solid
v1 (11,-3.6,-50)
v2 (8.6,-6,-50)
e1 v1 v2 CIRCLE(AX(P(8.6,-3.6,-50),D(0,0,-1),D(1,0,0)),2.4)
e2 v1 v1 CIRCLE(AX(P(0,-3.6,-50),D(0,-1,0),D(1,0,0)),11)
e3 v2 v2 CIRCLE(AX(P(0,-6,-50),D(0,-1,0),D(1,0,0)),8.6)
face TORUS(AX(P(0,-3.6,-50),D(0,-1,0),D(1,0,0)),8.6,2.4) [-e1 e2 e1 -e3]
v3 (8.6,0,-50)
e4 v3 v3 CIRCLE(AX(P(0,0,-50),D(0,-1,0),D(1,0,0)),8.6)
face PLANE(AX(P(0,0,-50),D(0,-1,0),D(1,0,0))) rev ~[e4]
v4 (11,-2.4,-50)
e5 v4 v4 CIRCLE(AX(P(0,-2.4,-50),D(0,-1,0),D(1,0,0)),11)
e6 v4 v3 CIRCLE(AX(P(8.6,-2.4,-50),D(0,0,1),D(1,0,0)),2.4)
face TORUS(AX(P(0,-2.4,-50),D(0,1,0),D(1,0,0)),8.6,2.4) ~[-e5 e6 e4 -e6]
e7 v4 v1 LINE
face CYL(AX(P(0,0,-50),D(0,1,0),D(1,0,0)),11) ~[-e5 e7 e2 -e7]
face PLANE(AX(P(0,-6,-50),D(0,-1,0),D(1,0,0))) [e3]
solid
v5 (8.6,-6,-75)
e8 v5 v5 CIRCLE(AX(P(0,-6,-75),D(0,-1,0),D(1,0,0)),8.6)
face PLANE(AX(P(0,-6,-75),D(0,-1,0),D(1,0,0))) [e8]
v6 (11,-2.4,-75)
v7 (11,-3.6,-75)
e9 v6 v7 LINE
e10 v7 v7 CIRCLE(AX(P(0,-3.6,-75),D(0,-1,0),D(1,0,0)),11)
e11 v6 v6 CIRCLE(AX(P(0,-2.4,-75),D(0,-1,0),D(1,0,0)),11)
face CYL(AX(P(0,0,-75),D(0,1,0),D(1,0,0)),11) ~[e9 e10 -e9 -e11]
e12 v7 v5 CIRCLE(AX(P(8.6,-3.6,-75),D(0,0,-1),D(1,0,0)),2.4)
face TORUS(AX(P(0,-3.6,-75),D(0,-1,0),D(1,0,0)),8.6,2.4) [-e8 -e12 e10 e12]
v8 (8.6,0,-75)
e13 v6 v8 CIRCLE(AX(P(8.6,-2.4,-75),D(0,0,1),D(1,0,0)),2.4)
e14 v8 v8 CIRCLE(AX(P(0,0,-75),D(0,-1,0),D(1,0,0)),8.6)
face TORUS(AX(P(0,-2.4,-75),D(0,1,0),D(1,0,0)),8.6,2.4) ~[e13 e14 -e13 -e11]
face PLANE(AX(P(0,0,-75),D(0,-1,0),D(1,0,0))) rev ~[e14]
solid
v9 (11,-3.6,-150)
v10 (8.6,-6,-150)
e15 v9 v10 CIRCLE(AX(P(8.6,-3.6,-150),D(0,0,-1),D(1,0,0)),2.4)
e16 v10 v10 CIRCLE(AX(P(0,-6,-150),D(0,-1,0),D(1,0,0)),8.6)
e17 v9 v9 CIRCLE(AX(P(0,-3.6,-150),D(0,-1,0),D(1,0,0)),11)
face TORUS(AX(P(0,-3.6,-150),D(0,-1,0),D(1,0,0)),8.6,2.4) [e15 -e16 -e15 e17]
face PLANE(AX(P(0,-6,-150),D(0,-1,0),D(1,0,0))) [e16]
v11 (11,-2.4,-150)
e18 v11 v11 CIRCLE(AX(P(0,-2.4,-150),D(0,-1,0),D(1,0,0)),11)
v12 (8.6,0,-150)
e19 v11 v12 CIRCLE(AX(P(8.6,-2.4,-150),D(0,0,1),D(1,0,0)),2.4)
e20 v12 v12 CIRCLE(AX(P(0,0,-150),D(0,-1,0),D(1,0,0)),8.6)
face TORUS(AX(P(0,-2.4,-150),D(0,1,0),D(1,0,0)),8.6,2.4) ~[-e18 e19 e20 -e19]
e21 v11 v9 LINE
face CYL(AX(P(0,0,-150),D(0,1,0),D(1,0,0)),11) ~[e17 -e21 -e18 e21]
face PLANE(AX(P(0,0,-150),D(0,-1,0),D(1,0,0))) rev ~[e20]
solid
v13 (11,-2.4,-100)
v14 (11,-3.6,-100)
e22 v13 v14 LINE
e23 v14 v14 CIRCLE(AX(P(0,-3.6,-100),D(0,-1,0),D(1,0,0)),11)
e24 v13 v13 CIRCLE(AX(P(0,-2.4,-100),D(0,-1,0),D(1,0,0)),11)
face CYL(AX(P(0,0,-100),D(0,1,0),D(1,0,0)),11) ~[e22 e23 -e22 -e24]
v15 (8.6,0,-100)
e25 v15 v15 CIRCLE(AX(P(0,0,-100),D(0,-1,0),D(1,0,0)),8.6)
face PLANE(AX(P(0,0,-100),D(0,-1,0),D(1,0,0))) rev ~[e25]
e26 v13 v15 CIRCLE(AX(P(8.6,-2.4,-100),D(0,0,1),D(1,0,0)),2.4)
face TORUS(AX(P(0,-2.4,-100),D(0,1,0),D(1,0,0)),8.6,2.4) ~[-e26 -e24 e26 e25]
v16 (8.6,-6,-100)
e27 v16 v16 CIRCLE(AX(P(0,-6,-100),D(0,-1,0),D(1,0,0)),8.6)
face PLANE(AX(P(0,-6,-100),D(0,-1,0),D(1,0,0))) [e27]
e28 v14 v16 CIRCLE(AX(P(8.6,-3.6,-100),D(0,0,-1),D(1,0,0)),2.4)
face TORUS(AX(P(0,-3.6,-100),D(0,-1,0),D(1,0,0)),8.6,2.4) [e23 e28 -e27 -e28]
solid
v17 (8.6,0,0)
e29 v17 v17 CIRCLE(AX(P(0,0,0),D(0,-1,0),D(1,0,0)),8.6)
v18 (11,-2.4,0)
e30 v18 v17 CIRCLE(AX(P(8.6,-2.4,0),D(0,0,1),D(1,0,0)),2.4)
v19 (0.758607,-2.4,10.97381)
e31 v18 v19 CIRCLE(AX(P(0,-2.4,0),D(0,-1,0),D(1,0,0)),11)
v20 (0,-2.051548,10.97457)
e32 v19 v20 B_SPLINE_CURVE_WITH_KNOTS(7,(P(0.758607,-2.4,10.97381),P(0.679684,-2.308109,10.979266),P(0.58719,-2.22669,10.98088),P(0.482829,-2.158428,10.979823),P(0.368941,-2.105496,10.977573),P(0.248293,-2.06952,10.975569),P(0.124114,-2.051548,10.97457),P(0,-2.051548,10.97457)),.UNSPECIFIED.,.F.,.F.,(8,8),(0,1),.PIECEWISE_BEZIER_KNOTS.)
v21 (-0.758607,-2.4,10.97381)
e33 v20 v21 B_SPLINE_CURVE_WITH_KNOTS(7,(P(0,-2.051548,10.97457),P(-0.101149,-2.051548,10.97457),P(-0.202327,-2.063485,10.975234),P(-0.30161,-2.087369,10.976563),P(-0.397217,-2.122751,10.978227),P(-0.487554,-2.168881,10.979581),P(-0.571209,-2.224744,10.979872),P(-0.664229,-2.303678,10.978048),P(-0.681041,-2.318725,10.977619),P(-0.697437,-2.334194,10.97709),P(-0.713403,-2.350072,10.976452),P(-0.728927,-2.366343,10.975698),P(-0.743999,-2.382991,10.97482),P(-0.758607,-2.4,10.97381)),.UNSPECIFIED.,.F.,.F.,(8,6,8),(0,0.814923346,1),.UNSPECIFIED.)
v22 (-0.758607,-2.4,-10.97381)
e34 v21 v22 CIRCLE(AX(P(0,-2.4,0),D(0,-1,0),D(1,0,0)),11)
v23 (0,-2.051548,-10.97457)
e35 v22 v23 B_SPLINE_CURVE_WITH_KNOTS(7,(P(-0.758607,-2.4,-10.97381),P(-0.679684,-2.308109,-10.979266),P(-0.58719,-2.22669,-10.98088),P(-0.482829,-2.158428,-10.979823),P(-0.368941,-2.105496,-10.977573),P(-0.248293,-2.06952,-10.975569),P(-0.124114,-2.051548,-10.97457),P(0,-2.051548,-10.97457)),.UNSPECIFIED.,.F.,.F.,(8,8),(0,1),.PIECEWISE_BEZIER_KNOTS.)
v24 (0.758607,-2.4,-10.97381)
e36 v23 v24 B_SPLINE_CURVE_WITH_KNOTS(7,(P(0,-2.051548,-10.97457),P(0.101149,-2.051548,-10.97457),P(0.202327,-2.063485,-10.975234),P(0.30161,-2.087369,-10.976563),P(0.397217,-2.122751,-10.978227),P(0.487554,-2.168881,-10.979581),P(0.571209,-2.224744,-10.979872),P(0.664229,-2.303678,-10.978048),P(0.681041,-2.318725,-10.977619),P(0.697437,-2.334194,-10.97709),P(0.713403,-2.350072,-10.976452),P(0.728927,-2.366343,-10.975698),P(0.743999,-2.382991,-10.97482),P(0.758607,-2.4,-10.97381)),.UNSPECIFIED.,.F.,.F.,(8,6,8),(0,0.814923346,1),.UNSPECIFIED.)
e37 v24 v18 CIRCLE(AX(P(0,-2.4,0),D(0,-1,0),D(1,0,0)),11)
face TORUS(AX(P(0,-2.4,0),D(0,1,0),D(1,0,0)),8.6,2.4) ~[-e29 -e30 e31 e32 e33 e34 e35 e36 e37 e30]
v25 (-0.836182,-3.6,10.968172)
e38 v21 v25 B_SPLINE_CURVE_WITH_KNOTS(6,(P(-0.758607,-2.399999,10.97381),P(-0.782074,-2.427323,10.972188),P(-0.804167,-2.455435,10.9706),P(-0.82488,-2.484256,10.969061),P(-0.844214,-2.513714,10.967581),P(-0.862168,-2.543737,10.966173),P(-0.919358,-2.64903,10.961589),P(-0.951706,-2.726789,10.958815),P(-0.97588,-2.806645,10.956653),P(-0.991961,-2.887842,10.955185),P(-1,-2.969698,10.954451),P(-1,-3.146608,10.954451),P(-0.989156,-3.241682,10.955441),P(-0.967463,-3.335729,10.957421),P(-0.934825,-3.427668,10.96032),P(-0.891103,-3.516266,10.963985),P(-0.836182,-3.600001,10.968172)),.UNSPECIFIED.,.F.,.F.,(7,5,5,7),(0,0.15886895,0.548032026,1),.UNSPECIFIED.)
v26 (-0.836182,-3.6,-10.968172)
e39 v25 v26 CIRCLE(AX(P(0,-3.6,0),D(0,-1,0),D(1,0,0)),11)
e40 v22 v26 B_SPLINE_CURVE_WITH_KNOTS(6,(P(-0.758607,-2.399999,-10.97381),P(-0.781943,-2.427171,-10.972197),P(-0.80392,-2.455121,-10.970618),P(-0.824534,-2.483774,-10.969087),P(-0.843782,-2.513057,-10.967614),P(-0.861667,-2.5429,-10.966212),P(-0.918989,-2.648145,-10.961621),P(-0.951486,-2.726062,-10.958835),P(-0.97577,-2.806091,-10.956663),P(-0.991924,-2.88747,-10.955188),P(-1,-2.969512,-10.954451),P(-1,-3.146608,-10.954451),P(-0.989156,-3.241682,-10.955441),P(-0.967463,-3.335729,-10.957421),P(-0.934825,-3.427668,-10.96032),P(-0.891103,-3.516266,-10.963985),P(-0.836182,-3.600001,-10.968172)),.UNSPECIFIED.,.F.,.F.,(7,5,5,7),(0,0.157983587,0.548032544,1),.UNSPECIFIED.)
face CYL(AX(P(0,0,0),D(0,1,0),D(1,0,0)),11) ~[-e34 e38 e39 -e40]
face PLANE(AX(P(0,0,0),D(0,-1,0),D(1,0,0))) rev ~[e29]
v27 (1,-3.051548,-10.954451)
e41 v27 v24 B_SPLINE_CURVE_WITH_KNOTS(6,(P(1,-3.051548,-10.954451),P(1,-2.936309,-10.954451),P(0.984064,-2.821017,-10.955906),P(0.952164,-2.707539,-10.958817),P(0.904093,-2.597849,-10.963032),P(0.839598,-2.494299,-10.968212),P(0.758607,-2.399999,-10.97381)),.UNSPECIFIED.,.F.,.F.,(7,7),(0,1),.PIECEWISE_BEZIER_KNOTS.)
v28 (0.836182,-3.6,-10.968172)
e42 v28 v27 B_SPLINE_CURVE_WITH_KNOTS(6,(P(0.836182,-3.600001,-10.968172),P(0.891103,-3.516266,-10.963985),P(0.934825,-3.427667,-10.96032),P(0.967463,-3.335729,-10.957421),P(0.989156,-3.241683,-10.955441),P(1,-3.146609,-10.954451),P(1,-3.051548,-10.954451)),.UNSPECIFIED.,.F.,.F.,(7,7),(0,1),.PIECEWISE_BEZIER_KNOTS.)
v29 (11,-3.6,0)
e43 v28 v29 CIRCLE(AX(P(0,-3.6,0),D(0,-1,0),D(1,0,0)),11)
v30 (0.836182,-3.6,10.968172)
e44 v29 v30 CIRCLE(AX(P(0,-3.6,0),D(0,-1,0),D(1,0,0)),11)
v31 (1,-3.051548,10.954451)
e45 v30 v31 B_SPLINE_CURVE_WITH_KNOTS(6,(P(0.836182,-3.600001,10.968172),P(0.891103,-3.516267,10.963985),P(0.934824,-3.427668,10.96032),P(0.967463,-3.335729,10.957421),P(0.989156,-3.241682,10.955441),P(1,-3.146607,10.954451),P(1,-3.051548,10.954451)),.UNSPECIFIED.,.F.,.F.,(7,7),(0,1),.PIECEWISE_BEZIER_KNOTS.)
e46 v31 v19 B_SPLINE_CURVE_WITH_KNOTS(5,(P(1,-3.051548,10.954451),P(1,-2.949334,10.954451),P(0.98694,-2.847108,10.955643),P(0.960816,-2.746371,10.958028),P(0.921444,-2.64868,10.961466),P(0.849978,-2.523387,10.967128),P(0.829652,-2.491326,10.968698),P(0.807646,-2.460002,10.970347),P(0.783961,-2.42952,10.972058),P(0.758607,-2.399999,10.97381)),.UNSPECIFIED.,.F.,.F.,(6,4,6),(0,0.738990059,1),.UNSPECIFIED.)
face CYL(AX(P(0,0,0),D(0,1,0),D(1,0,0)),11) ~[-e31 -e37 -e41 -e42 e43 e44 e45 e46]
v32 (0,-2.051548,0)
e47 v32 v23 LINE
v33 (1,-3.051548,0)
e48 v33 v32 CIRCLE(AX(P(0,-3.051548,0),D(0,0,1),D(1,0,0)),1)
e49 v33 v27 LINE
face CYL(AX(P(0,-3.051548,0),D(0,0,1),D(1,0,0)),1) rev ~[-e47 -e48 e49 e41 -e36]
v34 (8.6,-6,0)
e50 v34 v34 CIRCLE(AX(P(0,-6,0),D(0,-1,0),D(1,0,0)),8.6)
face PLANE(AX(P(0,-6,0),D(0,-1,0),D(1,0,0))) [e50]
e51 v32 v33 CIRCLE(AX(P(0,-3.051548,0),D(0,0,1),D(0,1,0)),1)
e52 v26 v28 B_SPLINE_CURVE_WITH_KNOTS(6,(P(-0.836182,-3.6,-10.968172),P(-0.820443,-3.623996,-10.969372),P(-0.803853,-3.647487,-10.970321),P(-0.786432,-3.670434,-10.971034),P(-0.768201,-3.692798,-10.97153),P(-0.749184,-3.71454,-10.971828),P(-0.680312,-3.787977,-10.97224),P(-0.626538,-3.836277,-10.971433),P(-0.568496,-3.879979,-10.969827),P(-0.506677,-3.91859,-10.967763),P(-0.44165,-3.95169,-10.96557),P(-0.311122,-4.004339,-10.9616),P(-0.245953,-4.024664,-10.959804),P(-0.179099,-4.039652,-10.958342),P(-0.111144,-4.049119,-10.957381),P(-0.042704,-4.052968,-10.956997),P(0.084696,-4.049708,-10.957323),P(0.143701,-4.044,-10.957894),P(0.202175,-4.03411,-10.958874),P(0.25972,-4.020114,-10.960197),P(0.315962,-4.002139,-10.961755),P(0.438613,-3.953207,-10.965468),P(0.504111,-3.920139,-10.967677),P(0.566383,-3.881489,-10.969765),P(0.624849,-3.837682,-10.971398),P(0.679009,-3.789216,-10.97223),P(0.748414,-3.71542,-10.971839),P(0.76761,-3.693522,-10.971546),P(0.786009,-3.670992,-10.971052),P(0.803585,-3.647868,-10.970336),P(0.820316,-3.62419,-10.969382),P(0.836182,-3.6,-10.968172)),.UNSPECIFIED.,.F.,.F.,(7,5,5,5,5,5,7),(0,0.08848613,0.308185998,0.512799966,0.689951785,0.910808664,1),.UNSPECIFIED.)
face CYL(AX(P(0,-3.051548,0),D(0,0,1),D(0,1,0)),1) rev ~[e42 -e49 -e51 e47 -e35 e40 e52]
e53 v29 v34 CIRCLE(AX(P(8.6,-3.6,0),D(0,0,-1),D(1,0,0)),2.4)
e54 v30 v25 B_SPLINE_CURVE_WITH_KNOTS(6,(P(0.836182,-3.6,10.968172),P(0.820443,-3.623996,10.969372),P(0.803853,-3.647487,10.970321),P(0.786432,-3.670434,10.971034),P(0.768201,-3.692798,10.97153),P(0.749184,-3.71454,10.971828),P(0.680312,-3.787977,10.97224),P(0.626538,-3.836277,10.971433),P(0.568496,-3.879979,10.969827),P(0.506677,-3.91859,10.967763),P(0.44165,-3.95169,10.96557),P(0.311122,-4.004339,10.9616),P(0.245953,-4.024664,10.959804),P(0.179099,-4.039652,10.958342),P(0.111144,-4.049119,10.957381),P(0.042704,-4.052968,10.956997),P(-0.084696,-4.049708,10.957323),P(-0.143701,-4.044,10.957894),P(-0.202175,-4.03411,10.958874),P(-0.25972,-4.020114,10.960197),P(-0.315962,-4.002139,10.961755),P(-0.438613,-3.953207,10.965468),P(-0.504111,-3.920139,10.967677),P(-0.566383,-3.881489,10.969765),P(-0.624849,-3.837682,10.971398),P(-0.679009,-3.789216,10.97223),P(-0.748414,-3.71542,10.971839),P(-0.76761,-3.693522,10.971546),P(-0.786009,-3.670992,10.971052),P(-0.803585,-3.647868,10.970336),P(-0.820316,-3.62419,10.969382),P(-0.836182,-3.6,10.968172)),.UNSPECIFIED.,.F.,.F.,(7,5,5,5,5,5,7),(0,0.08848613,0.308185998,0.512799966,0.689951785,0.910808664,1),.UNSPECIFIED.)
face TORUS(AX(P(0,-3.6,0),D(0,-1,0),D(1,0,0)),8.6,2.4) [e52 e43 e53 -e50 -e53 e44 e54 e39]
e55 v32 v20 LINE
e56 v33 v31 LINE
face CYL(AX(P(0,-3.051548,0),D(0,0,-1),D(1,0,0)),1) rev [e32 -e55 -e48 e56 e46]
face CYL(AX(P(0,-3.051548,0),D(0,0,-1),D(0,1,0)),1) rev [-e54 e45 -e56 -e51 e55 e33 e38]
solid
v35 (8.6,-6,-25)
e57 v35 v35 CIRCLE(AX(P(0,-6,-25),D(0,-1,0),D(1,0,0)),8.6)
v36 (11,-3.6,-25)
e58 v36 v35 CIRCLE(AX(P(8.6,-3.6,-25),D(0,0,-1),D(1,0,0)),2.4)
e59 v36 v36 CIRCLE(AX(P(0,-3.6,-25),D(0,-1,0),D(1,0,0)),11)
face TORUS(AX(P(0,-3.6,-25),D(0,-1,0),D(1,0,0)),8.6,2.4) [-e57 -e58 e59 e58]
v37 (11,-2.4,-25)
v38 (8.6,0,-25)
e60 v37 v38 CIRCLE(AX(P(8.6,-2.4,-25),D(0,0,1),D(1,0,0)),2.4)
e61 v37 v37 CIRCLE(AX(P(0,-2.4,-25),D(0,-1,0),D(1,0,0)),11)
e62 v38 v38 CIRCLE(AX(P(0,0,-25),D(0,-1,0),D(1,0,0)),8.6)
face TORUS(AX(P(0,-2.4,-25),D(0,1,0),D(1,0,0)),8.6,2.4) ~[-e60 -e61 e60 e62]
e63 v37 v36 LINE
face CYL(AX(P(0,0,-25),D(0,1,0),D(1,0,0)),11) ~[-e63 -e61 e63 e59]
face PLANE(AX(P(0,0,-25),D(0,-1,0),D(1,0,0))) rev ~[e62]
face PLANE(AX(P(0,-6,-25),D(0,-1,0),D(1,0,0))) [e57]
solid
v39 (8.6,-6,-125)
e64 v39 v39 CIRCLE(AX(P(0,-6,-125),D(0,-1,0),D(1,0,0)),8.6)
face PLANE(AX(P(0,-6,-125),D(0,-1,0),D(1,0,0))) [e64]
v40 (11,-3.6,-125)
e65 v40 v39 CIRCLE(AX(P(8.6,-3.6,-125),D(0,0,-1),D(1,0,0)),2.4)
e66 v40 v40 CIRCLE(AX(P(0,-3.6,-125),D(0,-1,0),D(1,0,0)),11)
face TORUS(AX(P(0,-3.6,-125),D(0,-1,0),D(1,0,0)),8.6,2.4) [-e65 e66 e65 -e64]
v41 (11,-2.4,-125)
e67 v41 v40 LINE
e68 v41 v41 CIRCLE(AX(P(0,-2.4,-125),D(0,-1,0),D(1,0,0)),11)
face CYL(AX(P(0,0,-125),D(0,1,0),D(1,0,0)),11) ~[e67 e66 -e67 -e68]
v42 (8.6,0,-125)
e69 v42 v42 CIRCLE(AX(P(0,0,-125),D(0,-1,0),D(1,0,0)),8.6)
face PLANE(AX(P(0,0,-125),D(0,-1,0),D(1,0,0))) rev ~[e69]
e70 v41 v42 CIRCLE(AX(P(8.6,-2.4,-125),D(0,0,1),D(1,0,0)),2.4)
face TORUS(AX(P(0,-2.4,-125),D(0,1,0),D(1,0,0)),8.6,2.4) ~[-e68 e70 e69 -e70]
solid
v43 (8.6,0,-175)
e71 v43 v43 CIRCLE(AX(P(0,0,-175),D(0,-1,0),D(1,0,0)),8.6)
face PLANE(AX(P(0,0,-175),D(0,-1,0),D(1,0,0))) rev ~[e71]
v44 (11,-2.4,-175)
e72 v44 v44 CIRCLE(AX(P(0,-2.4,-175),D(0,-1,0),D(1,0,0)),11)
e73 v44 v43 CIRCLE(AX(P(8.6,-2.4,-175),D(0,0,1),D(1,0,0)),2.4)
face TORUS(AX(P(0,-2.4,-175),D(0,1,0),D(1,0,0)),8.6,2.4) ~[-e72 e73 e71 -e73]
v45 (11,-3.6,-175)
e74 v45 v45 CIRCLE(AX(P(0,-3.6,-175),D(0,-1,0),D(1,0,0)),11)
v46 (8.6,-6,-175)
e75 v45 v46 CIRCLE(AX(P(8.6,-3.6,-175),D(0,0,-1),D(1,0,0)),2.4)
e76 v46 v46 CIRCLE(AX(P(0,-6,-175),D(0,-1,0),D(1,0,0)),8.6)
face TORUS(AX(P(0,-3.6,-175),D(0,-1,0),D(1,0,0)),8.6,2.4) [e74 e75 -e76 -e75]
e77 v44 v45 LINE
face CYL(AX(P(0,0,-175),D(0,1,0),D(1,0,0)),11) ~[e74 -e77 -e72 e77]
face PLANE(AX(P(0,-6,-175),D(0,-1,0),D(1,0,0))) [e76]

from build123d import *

# Parameters (mm, degrees)
F0_R          = 11
F1_DEPTH      = 6
F2_R          = 2.4
F2_2_R        = 2.4
F2_3_R        = 2.4
F2_4_R        = 2.4
F2_5_R        = 2.4
F2_6_R        = 2.4
F2_7_R        = 2.4
F2_8_R        = 2.4
F4_DEPTH      = 186.001
F4_DEPTH_BACK = 11.0010001


with BuildPart() as f1:
    # F0 (on Front) → F1 (new body)
    with BuildSketch(Plane.XZ):
        Circle(F0_R)
    extrude(amount=F1_DEPTH)

    # F2
    f2_edges = [f1.edges().sort_by_distance(p)[0] for p in [
        (-11, 0, 0),
        (-11, -6, 0),
    ]]
    fillet(f2_edges, radius=F2_R)

    # F3 (on Top) → F4 (cut, two sides)
    with BuildSketch(Plane.XY) as f4_sk:
        with BuildLine():
            ThreePointArc((0, -2.0515482649), (-0.7071067812, -3.7586550461), (1, -3.0515482649))
            ThreePointArc((1, -3.0515482649), (0.7071067812, -2.3444414837), (0, -2.0515482649))
        make_face()
    extrude(amount=-F4_DEPTH, mode=Mode.SUBTRACT)
    extrude(f4_sk.sketch, amount=F4_DEPTH_BACK, mode=Mode.SUBTRACT)


with BuildPart() as f1b:
    # F0 (on Front) → F1, piece 2 (new body)
    with BuildSketch(Plane.XZ):
        with Locations((0, -25)):
            Circle(F0_R)
    extrude(amount=F1_DEPTH)

    # F2#2
    f2_2_edges = [f1b.edges().sort_by_distance(p)[0] for p in [
        (-11, -6, -25),
        (-11, 0, -25),
    ]]
    fillet(f2_2_edges, radius=F2_2_R)


with BuildPart() as f1c:
    # F0 (on Front) → F1, piece 3 (new body)
    with BuildSketch(Plane.XZ):
        with Locations((0, -50)):
            Circle(F0_R)
    extrude(amount=F1_DEPTH)

    # F2#3
    f2_3_edges = [f1c.edges().sort_by_distance(p)[0] for p in [
        (-11, -6, -50),
        (-11, 0, -50),
    ]]
    fillet(f2_3_edges, radius=F2_3_R)


with BuildPart() as f1d:
    # F0 (on Front) → F1, piece 4 (new body)
    with BuildSketch(Plane.XZ):
        with Locations((0, -75)):
            Circle(F0_R)
    extrude(amount=F1_DEPTH)

    # F2#4
    f2_4_edges = [f1d.edges().sort_by_distance(p)[0] for p in [
        (-11, -6, -75),
        (-11, 0, -75),
    ]]
    fillet(f2_4_edges, radius=F2_4_R)


with BuildPart() as f1e:
    # F0 (on Front) → F1, piece 5 (new body)
    with BuildSketch(Plane.XZ):
        with Locations((0, -100)):
            Circle(F0_R)
    extrude(amount=F1_DEPTH)

    # F2#5
    f2_5_edges = [f1e.edges().sort_by_distance(p)[0] for p in [
        (-11, -6, -100),
        (-11, 0, -100),
    ]]
    fillet(f2_5_edges, radius=F2_5_R)


with BuildPart() as f1f:
    # F0 (on Front) → F1, piece 6 (new body)
    with BuildSketch(Plane.XZ):
        with Locations((0, -125)):
            Circle(F0_R)
    extrude(amount=F1_DEPTH)

    # F2#6
    f2_6_edges = [f1f.edges().sort_by_distance(p)[0] for p in [
        (-11, -6, -125),
        (-11, 0, -125),
    ]]
    fillet(f2_6_edges, radius=F2_6_R)


with BuildPart() as f1g:
    # F0 (on Front) → F1, piece 7 (new body)
    with BuildSketch(Plane.XZ):
        with Locations((0, -150)):
            Circle(F0_R)
    extrude(amount=F1_DEPTH)

    # F2#7
    f2_7_edges = [f1g.edges().sort_by_distance(p)[0] for p in [
        (-11, -6, -150),
        (-11, 0, -150),
    ]]
    fillet(f2_7_edges, radius=F2_7_R)


with BuildPart() as f1h:
    # F0 (on Front) → F1, piece 8 (new body)
    with BuildSketch(Plane.XZ):
        with Locations((0, -175)):
            Circle(F0_R)
    extrude(amount=F1_DEPTH)

    # F2#8
    f2_8_edges = [f1h.edges().sort_by_distance(p)[0] for p in [
        (-11, -6, -175),
        (-11, 0, -175),
    ]]
    fillet(f2_8_edges, radius=F2_8_R)


solid = Compound([f1.part, f1b.part, f1c.part, f1d.part, f1e.part, f1f.part, f1g.part, f1h.part])
